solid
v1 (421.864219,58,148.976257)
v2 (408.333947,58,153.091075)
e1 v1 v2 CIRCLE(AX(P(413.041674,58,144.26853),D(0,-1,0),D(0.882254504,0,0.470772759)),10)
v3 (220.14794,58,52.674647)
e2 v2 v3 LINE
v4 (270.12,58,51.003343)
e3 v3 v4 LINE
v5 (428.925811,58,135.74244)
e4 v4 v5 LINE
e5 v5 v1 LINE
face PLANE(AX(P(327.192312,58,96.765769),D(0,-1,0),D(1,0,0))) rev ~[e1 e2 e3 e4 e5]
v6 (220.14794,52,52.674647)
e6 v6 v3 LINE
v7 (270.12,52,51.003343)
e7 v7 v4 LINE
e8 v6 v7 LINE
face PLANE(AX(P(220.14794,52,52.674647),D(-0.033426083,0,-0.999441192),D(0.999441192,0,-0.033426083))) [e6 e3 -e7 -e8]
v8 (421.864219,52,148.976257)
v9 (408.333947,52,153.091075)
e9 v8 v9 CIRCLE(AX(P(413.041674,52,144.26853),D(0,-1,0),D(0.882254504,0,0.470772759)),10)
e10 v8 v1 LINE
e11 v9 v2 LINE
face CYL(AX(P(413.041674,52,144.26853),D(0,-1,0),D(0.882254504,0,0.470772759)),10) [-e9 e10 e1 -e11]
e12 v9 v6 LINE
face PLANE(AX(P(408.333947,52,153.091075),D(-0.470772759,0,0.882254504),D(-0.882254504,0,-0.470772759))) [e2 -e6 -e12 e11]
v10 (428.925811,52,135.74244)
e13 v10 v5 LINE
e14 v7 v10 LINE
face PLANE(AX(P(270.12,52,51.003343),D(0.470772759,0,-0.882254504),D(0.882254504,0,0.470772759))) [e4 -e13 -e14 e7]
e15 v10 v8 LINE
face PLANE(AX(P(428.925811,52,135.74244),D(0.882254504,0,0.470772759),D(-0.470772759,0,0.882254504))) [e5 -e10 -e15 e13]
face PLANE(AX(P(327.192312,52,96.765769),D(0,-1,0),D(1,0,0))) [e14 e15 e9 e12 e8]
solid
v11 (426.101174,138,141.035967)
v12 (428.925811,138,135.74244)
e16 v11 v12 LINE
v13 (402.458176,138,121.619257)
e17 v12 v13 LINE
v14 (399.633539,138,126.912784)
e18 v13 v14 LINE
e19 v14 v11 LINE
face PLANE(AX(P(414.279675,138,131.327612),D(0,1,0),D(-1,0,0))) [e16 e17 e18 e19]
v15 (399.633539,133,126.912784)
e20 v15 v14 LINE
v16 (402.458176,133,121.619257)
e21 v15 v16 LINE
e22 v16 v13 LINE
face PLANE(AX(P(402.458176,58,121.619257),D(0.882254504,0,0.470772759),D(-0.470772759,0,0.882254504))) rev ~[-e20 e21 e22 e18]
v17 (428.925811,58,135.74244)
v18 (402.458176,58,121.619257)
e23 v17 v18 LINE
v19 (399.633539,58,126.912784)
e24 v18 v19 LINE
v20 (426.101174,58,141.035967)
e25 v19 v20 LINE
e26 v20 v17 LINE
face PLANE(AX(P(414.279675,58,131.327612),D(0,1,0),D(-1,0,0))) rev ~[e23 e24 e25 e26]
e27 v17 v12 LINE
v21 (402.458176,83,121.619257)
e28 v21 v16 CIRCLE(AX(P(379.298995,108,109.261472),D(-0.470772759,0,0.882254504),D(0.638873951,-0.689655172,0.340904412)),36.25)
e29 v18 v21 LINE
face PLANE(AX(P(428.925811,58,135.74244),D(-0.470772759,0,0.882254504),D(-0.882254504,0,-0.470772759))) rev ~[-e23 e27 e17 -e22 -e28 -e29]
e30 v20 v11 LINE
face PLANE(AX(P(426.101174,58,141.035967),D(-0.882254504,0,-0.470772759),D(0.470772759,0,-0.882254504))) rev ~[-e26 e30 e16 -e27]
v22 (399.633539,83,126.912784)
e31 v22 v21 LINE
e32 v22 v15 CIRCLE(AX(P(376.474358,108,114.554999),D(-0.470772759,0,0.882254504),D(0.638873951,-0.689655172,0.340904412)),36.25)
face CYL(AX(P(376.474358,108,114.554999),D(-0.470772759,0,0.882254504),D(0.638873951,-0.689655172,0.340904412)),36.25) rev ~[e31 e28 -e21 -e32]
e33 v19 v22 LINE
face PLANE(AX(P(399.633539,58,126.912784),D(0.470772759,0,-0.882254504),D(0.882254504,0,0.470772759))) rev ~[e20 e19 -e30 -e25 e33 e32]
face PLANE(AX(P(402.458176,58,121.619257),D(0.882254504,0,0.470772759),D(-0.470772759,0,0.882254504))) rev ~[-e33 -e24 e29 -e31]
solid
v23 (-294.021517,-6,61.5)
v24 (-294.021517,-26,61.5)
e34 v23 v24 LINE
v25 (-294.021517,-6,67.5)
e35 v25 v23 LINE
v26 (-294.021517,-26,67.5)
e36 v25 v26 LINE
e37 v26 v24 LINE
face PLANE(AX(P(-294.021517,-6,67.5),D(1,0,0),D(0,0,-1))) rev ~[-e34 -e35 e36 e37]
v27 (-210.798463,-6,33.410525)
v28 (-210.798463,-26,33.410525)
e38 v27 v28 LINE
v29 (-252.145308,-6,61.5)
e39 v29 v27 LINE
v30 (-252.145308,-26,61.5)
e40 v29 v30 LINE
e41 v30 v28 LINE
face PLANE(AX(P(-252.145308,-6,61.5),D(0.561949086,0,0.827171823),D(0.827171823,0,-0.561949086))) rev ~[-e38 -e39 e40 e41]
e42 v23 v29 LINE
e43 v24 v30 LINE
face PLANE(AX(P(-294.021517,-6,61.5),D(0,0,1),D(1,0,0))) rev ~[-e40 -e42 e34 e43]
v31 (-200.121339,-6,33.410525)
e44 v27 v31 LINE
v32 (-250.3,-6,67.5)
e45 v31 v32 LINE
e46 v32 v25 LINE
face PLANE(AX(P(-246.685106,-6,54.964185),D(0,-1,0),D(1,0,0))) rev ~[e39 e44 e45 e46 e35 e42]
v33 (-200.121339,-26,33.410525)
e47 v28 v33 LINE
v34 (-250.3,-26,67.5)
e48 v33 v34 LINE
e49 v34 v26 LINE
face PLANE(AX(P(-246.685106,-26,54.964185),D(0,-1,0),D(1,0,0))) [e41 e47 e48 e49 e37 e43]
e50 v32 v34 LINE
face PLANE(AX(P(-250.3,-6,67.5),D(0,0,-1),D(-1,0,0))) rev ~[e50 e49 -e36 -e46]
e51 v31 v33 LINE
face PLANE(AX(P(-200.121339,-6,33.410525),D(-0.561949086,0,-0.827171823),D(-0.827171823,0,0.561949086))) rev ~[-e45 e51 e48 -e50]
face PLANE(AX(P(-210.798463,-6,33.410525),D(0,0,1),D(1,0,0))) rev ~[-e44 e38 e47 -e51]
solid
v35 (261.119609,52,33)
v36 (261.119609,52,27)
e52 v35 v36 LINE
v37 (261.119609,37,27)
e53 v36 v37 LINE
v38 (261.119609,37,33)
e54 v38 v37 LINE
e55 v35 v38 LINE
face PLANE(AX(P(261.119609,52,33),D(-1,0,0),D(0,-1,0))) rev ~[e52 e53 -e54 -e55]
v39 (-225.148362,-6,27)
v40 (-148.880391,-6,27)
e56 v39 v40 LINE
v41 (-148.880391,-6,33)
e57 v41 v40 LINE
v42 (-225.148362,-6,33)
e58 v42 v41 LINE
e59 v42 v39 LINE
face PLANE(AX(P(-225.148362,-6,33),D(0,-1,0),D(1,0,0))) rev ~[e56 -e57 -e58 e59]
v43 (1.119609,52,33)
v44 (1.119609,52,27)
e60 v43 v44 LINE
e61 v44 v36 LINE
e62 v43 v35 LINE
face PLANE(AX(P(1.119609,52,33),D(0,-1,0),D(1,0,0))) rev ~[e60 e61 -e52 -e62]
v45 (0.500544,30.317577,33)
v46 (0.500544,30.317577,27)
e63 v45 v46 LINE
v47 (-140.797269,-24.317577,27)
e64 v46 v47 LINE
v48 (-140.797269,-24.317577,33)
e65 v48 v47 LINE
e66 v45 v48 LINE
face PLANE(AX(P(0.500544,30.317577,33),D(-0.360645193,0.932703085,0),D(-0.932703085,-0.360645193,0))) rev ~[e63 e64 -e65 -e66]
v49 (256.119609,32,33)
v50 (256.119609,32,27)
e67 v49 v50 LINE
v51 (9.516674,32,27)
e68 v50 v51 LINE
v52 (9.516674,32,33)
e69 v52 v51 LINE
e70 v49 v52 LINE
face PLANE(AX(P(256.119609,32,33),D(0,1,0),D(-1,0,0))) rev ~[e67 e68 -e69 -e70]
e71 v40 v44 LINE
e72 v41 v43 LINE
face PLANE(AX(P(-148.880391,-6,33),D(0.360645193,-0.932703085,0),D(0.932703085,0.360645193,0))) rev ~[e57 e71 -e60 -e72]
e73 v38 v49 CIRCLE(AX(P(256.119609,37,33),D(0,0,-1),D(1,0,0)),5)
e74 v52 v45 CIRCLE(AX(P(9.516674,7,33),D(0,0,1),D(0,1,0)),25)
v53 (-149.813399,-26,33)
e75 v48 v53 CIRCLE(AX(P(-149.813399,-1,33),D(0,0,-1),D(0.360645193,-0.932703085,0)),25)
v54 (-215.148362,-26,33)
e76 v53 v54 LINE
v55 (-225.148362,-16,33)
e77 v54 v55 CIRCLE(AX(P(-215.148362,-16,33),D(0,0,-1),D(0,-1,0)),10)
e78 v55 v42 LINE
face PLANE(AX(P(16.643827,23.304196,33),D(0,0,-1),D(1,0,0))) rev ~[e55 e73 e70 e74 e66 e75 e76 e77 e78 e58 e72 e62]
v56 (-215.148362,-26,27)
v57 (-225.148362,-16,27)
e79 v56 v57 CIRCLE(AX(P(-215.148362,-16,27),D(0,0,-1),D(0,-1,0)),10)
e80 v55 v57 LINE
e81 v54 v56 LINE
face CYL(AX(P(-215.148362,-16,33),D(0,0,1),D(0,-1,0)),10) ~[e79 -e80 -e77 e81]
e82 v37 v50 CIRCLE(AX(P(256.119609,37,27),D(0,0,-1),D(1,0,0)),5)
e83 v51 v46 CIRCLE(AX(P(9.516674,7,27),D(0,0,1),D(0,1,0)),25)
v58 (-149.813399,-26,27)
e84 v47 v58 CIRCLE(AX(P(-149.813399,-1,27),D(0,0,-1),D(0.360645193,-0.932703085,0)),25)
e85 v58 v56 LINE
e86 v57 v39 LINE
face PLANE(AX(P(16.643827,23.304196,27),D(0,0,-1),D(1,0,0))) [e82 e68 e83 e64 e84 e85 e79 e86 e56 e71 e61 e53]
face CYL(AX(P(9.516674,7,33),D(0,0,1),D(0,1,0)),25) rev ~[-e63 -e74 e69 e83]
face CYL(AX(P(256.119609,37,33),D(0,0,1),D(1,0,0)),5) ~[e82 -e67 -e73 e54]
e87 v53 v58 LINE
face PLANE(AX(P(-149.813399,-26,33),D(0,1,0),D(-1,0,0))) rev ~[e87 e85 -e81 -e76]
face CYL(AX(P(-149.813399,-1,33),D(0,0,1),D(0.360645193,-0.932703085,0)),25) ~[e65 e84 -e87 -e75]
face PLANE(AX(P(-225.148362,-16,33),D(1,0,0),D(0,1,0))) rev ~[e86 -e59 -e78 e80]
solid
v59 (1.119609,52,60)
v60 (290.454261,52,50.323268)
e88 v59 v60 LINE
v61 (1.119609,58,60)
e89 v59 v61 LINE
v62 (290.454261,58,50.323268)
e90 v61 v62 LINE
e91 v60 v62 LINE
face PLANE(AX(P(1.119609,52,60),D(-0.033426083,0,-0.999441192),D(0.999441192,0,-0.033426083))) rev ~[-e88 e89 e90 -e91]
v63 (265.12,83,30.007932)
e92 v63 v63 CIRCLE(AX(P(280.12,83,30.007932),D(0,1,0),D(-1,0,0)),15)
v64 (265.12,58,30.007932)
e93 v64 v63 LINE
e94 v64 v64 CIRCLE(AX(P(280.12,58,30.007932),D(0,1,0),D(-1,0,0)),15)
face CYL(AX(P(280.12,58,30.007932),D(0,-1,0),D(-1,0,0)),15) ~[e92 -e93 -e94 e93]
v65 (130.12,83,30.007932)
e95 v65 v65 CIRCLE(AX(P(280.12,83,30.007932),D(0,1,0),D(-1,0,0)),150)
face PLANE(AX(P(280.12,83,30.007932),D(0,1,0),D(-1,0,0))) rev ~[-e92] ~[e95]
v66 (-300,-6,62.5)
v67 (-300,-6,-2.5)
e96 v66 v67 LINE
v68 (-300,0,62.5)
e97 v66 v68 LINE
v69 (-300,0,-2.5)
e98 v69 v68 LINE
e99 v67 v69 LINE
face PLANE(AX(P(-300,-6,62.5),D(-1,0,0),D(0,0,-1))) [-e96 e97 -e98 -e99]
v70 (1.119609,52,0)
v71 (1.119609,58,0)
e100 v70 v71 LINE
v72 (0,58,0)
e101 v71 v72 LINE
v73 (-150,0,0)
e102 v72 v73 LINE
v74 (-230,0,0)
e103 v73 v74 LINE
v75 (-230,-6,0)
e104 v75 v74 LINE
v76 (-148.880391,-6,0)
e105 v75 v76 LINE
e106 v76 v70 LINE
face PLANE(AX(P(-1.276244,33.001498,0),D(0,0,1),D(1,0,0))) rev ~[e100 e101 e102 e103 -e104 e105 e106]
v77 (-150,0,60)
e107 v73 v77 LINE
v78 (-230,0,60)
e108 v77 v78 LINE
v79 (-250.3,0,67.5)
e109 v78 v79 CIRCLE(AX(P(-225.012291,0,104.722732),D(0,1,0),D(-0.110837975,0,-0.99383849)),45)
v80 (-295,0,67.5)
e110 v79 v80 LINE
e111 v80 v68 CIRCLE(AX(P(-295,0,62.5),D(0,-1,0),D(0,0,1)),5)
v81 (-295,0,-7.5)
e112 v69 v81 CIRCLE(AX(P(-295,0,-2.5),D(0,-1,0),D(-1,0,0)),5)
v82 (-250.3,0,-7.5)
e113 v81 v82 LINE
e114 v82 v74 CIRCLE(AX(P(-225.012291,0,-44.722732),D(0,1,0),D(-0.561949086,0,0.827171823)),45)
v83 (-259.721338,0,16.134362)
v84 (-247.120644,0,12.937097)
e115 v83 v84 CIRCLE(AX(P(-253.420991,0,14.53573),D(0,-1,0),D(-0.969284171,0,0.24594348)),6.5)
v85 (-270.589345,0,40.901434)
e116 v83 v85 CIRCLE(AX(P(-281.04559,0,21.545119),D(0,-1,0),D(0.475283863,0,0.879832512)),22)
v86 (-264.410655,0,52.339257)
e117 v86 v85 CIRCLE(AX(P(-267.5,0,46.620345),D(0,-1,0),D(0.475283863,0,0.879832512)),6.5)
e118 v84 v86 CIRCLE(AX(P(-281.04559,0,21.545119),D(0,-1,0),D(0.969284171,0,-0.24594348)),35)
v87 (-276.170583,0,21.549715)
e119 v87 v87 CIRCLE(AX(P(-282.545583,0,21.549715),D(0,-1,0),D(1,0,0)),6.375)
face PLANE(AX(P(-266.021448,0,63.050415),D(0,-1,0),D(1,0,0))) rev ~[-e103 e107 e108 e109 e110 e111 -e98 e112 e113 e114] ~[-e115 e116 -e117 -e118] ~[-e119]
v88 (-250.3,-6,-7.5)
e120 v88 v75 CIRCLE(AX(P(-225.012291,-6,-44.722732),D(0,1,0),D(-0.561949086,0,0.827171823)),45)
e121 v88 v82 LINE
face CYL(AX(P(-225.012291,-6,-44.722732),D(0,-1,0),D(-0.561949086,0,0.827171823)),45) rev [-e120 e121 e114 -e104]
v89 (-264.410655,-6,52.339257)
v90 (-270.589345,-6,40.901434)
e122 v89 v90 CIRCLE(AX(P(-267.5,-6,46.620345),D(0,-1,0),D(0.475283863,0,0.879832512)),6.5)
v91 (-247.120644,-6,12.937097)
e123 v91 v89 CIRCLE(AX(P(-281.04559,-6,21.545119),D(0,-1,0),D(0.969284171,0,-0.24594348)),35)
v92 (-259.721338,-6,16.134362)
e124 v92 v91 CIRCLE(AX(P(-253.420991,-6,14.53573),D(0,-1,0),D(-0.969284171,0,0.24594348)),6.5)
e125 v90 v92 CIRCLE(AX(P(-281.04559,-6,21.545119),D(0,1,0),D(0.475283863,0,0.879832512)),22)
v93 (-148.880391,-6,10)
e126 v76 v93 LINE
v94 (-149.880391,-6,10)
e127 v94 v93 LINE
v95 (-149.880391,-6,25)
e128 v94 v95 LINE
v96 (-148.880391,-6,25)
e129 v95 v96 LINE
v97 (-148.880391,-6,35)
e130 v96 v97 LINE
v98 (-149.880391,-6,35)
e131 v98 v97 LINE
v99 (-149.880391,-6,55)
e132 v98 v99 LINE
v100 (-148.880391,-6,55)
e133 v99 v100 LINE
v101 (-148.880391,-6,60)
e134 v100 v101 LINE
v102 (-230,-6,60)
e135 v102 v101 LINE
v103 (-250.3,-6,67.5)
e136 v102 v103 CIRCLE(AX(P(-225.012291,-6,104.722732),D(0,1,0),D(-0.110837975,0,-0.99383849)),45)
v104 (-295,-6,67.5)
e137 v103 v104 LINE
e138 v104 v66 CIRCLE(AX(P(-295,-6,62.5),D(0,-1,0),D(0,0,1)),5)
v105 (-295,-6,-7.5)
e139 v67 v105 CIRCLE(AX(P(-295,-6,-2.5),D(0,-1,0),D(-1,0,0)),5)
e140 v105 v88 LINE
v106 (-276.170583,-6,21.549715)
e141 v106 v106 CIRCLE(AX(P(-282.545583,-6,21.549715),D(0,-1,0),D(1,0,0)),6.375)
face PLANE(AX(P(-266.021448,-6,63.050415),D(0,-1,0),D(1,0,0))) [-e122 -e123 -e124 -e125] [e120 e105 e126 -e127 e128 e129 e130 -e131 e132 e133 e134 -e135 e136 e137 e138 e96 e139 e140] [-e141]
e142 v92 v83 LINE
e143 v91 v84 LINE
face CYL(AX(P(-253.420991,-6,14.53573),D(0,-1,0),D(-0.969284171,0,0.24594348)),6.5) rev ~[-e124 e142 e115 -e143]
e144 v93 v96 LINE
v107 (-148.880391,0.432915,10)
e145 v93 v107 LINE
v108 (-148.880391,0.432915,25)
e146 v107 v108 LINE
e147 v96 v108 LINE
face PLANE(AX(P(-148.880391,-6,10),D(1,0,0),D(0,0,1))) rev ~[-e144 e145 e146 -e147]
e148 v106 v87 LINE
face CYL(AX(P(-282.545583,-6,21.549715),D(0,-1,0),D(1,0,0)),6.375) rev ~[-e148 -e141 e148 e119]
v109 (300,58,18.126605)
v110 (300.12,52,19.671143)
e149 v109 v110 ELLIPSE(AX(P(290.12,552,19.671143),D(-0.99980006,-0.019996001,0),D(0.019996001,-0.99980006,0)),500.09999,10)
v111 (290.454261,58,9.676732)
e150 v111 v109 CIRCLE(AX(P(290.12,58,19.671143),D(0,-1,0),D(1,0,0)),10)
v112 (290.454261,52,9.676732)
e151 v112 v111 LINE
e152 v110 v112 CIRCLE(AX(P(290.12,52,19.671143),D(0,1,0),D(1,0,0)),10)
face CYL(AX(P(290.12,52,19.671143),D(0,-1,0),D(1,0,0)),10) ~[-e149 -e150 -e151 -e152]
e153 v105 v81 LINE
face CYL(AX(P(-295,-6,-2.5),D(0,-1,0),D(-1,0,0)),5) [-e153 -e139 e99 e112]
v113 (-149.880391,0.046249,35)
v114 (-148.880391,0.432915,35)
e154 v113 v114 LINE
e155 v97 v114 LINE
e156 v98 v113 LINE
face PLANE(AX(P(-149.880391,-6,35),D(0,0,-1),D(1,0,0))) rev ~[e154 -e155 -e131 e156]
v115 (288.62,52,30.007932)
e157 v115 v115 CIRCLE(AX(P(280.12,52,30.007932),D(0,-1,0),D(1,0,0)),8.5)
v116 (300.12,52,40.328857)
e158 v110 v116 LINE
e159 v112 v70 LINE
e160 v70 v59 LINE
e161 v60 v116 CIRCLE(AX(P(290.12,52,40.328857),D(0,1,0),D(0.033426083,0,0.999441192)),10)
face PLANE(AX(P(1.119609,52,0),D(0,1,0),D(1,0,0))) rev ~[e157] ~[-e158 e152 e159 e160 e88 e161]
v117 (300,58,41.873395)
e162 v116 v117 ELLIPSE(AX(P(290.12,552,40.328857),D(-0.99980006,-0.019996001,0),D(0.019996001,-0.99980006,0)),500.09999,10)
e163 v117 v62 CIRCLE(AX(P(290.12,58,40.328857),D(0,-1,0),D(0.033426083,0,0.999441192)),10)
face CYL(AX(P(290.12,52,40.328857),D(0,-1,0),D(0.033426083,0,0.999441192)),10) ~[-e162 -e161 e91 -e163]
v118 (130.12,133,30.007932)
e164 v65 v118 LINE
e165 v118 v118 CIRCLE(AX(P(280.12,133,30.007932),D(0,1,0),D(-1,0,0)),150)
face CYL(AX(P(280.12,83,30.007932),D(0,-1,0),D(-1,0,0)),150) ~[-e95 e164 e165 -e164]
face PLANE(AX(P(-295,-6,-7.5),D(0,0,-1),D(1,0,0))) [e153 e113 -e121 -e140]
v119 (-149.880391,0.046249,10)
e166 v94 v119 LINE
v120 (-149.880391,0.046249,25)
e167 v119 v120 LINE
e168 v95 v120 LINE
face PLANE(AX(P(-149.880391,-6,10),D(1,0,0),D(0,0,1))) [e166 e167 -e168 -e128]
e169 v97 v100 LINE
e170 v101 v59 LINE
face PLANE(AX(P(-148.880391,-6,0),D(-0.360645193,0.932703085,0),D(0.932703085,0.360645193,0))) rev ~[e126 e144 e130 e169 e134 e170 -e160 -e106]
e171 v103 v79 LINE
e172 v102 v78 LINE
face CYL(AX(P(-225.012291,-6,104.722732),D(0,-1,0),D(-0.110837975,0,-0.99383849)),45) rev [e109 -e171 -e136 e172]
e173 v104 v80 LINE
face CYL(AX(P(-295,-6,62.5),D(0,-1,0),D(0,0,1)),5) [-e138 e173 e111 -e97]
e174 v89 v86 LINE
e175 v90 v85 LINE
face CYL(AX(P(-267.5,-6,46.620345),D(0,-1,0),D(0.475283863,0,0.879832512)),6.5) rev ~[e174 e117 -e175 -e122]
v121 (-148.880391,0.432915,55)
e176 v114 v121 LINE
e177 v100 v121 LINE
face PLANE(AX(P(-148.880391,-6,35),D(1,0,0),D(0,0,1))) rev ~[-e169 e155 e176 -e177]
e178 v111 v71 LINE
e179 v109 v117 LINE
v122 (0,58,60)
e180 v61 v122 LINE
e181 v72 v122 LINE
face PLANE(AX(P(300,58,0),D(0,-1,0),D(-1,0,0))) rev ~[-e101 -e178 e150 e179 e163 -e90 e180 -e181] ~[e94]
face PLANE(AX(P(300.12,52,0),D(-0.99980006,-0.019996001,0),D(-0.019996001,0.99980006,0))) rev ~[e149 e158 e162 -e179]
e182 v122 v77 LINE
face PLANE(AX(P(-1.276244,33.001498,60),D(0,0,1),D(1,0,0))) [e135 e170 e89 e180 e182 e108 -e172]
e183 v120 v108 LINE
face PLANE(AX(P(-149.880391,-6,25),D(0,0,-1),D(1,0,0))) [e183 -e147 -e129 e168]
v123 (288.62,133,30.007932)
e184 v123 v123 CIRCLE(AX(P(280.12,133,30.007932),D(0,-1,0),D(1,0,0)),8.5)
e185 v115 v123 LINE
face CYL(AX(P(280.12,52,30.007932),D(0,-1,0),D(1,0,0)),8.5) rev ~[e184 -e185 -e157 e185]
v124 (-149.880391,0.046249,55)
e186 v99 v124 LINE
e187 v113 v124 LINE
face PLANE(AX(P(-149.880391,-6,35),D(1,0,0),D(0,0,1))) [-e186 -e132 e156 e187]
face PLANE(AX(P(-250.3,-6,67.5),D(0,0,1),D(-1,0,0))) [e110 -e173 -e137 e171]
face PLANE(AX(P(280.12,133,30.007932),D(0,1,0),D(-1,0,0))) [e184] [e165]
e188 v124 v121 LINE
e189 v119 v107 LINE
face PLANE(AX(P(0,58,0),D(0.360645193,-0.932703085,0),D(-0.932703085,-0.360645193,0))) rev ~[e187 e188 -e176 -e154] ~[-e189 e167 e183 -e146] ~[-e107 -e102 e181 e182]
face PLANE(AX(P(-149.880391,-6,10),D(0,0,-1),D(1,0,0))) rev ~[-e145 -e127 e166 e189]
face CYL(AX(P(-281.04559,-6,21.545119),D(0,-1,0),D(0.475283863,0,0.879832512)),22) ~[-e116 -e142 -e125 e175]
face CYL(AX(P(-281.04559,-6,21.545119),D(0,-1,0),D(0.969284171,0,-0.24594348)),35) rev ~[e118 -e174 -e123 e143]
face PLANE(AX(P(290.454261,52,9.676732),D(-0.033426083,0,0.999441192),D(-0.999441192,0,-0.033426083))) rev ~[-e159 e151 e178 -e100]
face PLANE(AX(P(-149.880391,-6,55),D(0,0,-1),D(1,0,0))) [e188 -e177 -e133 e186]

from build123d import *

# Parameters (mm, degrees)
F1_DEPTH  = 60
F3_R      = 8.25
F4_DEPTH  = 25
F5_DEPTH  = 6
F6_R      = 6.375
F7_DEPTH  = 25
F10_DEPTH = 6
F11_DEPTH = 6
F12_DEPTH = 25
F13_DEPTH = 25
F14_W     = 1
F14_H     = 20
F14_H_2   = 15
F15_DEPTH = 25
F17_DEPTH = 20
F18_R     = 15
F19_DEPTH = 25
F21_DEPTH = 50
F23_DEPTH = 6
F25_DEPTH = 80
F27_DEPTH = 25
F28_R     = 8.5
F29_DEPTH = 86.001


# Not quite as in the source:
# - a feature names something its author has since deleted; it is built from what else it names


with BuildPart() as f1:
    # F0 (on Top) → F1 (new body)
    with BuildSketch(Plane.XY):
        Polygon((-150, 0), (-300, 0), (-300, -6), (-148.8803913162, -6), (1.1196086838, 52), (300.12, 52), (300, 58), (0, 58), align=None)
    extrude(amount=F1_DEPTH)

    # F3 (on face) → F4 (cut)
    with BuildSketch(Plane.XZ.offset(-52)):
        with BuildLine():
            Line((300.12, 60), (1.1196086838, 60))
            Line((1.1196086838, 60), (290.4542608309, 50.3232684455))
            ThreePointArc((290.4542608309, 50.3232684455), (297.3082754646, 47.2807408597), (300.12, 40.3288565219))
            Line((300.12, 40.3288565219), (300.12, 60))
        make_face()
        with BuildLine():
            Line((290.4542608309, 9.6767315545), (1.1196086838, 0))
            Line((1.1196086838, 0), (300.12, 0))
            Line((300.12, 0), (300.12, 19.6711434781))
            ThreePointArc((300.12, 19.6711434781), (297.3082754646, 12.7192591403), (290.4542608309, 9.6767315545))
        make_face()
        with Locations((280.12, 30.0079316213)):
            Circle(F3_R)
    extrude(amount=-F4_DEPTH, mode=Mode.SUBTRACT)

    # F2 (on face) → F5 (join)
    with BuildSketch(Plane.XZ.offset(6)):
        with BuildLine():
            Line((-250.3, 67.5), (-295, 67.5))
            ThreePointArc((-295, 67.5), (-298.5355339059, 66.0355339059), (-300, 62.5))
            Line((-300, 62.5), (-300, 60))
            Line((-300, 60), (-230, 60))
            ThreePointArc((-230, 60), (-240.6075702178, 62.5115099439), (-250.3, 67.5))
        make_face()
    extrude(amount=-F5_DEPTH)

    # F6 (on face) → F7 (cut)
    with BuildSketch(Plane.XZ.offset(6)):
        with BuildLine():
            ThreePointArc((-259.7213383401, 16.1343621796), (-255.0196238496, 8.2353824448), (-247.1206441149, 12.9370969353))
            ThreePointArc((-247.1206441149, 12.9370969353), (-248.9955051627, 35.6089750865), (-264.4106548881, 52.339256668))
            ThreePointArc((-264.4106548881, 52.339256668), (-273.2189113282, 49.7096904517), (-270.5893451119, 40.9014340116))
            ThreePointArc((-270.5893451119, 40.9014340116), (-260.8998224273, 30.3852570175), (-259.7213383401, 16.1343621796))
        make_face()
        with Locations((-282.545583065, 21.5497146659)):
            Circle(F6_R)
    extrude(amount=-F7_DEPTH, mode=Mode.SUBTRACT)

    # F2 (on face) → F11 (join)
    with BuildSketch(Plane.XZ.offset(6)):
        with BuildLine():
            Line((-250.3, 67.5), (-295, 67.5))
            ThreePointArc((-295, 67.5), (-298.5355339059, 66.0355339059), (-300, 62.5))
            Line((-300, 62.5), (-300, 60))
            Line((-300, 60), (-300, 0))
            Line((-300, 0), (-300, -2.5))
            ThreePointArc((-300, -2.5), (-298.5355339059, -6.0355339059), (-295, -7.5))
            Line((-295, -7.5), (-250.3, -7.5))
            ThreePointArc((-250.3, -7.5), (-240.6075702178, -2.5115099439), (-230, 0))
            Line((-230, 0), (-230, 60))
            ThreePointArc((-230, 60), (-240.6075702178, 62.5115099439), (-250.3, 67.5))
        make_face()
    extrude(amount=-F11_DEPTH)

    # F6 (on face) → F12 (cut)
    with BuildSketch(Plane.XZ.offset(6)):
        with BuildLine():
            ThreePointArc((-259.7213383401, 16.1343621796), (-255.0196238496, 8.2353824448), (-247.1206441149, 12.9370969353))
            ThreePointArc((-247.1206441149, 12.9370969353), (-248.9955051627, 35.6089750865), (-264.4106548881, 52.339256668))
            ThreePointArc((-264.4106548881, 52.339256668), (-273.2189113282, 49.7096904517), (-270.5893451119, 40.9014340116))
            ThreePointArc((-270.5893451119, 40.9014340116), (-260.8998224273, 30.3852570175), (-259.7213383401, 16.1343621796))
        make_face()
        with Locations((-282.545583065, 21.5497146659)):
            Circle(F6_R)
    extrude(amount=-F12_DEPTH, mode=Mode.SUBTRACT)

    # F6 (on face) → F13 (cut)
    with BuildSketch(Plane.XZ.offset(6)):
        with BuildLine():
            ThreePointArc((-259.7213383401, 16.1343621796), (-255.0196238496, 8.2353824448), (-247.1206441149, 12.9370969353))
            ThreePointArc((-247.1206441149, 12.9370969353), (-248.9955051627, 35.6089750865), (-264.4106548881, 52.339256668))
            ThreePointArc((-264.4106548881, 52.339256668), (-273.2189113282, 49.7096904517), (-270.5893451119, 40.9014340116))
            ThreePointArc((-270.5893451119, 40.9014340116), (-260.8998224273, 30.3852570175), (-259.7213383401, 16.1343621796))
        make_face()
        with Locations((-282.545583065, 21.5497146659)):
            Circle(F6_R)
    extrude(amount=-F13_DEPTH, mode=Mode.SUBTRACT)

    # F14 (on face) → F15 (cut)
    with BuildSketch(Plane.XZ.offset(6)):
        with Locations((-149.3803913162, 45)):
            Rectangle(F14_W, F14_H)
        with Locations((-149.3803913162, 17.5)):
            Rectangle(F14_W, F14_H_2)
    extrude(amount=-F15_DEPTH, mode=Mode.SUBTRACT)

    # F18 (on face) → F19 (join)
    with BuildSketch(Plane(origin=(0, 58, 0), x_dir=(-1, 0, 0), z_dir=(0, 1, 0))):
        with Locations((-280.12, 30.0079316213)):
            Circle(F18_R)
    extrude(amount=F19_DEPTH)

    # F20 (on face) → F21 (join)
    with BuildSketch(Plane(origin=(0, 83, 0), x_dir=(-1, 0, 0), z_dir=(0, 1, 0))):
        with BuildLine():
            ThreePointArc((-306.8151369112, 177.6133843163), (-376.2858189362, -85.1099873502), (-130.12, 30.0079316213))
            ThreePointArc((-130.12, 30.0079316213), (-183.9541810638, 145.1258505929), (-306.8151369112, 177.6133843163))
        make_face()
    extrude(amount=F21_DEPTH)

    # F28 (on face) → F29 (cut, through all)
    with BuildSketch(Plane.XZ.offset(-52)):
        with Locations((280.12, 30.0079316213)):
            Circle(F28_R)
    extrude(amount=-F29_DEPTH, mode=Mode.SUBTRACT)


with BuildPart() as f10:
    # F9 (on offset) → F10 (new body)
    with BuildSketch(Plane(origin=(0, 0, 33), x_dir=(1, 0, 0), z_dir=(0, 0, -1))):
        with BuildLine():
            Line((-225.14836237, 16), (-225.14836237, 6))
            Line((-225.14836237, 6), (-148.8803913162, 6))
            Line((-148.8803913162, 6), (1.1196086838, -52))
            Line((1.1196086838, -52), (261.1196086838, -52))
            Line((261.1196086838, -52), (261.1196086838, -37))
            ThreePointArc((261.1196086838, -37), (259.6551425898, -33.4644660941), (256.1196086838, -32))
            Line((256.1196086838, -32), (9.5166738126, -32))
            ThreePointArc((9.5166738126, -32), (4.930794843, -31.5757952888), (0.5005439906, -30.3175771261))
            Line((0.5005439906, -30.3175771261), (-140.7972687306, 24.3175771261))
            ThreePointArc((-140.7972687306, 24.3175771261), (-145.2275195831, 25.5757952888), (-149.8133985527, 26))
            Line((-149.8133985527, 26), (-215.14836237, 26))
            ThreePointArc((-215.14836237, 26), (-222.2194301819, 23.0710678119), (-225.14836237, 16))
        make_face()
    extrude(amount=F10_DEPTH)


with BuildPart() as f17:
    # F16 (on face) → F17 (new body)
    with BuildSketch(Plane.XZ.offset(6)):
        Polygon((-250.3, 67.5), (-294.0215170383, 67.5), (-294.0215170383, 61.5), (-252.1453078549, 61.5), (-210.7984625637, 33.4105253768), (-200.1213386967, 33.4105253768), align=None)
    extrude(amount=F17_DEPTH)


with BuildPart() as f23:
    # F22 (on face) → F23 (new body)
    with BuildSketch(Plane.XZ.offset(-52)):
        with BuildLine():
            Line((270.12, 51.0033431685), (428.9258106677, 135.7424398015))
            Line((428.9258106677, 135.7424398015), (421.8642192816, 148.9762573572))
            ThreePointArc((421.8642192816, 148.9762573572), (415.9512895642, 153.8358772929), (408.3339466538, 153.0910748035))
            Line((408.3339466538, 153.0910748035), (220.1479403824, 52.6746473229))
            Line((220.1479403824, 52.6746473229), (270.12, 51.0033431685))
        make_face()
    extrude(amount=-F23_DEPTH)


with BuildPart() as f25:
    # F24 (on face) → F25 (new body)
    with BuildSketch(Plane(origin=(0, 58, 0), x_dir=(-1, 0, 0), z_dir=(0, 1, 0))):
        Polygon((-426.1011741132, 141.0359668238), (-428.9258106677, 135.7424398015), (-402.4581755564, 121.6192570294), (-399.633539002, 126.9127840516), align=None)
    extrude(amount=F25_DEPTH)

    # F26 (on face) → F27 (cut)
    with BuildSketch(Plane(origin=(35.8574468804, 0, -67.1988627041), x_dir=(0.8822545037, 0, 0.4707727591), z_dir=(-0.4707727591, 0, 0.8822545037))):
        with BuildLine():
            Line((412.3255711273, 133), (412.3255711273, 83))
            ThreePointArc((412.3255711273, 83), (422.3255711273, 108), (412.3255711273, 133))
        make_face()
    extrude(amount=-F27_DEPTH, mode=Mode.SUBTRACT)


solid = Compound([f1.part, f10.part, f17.part, f23.part, f25.part])
